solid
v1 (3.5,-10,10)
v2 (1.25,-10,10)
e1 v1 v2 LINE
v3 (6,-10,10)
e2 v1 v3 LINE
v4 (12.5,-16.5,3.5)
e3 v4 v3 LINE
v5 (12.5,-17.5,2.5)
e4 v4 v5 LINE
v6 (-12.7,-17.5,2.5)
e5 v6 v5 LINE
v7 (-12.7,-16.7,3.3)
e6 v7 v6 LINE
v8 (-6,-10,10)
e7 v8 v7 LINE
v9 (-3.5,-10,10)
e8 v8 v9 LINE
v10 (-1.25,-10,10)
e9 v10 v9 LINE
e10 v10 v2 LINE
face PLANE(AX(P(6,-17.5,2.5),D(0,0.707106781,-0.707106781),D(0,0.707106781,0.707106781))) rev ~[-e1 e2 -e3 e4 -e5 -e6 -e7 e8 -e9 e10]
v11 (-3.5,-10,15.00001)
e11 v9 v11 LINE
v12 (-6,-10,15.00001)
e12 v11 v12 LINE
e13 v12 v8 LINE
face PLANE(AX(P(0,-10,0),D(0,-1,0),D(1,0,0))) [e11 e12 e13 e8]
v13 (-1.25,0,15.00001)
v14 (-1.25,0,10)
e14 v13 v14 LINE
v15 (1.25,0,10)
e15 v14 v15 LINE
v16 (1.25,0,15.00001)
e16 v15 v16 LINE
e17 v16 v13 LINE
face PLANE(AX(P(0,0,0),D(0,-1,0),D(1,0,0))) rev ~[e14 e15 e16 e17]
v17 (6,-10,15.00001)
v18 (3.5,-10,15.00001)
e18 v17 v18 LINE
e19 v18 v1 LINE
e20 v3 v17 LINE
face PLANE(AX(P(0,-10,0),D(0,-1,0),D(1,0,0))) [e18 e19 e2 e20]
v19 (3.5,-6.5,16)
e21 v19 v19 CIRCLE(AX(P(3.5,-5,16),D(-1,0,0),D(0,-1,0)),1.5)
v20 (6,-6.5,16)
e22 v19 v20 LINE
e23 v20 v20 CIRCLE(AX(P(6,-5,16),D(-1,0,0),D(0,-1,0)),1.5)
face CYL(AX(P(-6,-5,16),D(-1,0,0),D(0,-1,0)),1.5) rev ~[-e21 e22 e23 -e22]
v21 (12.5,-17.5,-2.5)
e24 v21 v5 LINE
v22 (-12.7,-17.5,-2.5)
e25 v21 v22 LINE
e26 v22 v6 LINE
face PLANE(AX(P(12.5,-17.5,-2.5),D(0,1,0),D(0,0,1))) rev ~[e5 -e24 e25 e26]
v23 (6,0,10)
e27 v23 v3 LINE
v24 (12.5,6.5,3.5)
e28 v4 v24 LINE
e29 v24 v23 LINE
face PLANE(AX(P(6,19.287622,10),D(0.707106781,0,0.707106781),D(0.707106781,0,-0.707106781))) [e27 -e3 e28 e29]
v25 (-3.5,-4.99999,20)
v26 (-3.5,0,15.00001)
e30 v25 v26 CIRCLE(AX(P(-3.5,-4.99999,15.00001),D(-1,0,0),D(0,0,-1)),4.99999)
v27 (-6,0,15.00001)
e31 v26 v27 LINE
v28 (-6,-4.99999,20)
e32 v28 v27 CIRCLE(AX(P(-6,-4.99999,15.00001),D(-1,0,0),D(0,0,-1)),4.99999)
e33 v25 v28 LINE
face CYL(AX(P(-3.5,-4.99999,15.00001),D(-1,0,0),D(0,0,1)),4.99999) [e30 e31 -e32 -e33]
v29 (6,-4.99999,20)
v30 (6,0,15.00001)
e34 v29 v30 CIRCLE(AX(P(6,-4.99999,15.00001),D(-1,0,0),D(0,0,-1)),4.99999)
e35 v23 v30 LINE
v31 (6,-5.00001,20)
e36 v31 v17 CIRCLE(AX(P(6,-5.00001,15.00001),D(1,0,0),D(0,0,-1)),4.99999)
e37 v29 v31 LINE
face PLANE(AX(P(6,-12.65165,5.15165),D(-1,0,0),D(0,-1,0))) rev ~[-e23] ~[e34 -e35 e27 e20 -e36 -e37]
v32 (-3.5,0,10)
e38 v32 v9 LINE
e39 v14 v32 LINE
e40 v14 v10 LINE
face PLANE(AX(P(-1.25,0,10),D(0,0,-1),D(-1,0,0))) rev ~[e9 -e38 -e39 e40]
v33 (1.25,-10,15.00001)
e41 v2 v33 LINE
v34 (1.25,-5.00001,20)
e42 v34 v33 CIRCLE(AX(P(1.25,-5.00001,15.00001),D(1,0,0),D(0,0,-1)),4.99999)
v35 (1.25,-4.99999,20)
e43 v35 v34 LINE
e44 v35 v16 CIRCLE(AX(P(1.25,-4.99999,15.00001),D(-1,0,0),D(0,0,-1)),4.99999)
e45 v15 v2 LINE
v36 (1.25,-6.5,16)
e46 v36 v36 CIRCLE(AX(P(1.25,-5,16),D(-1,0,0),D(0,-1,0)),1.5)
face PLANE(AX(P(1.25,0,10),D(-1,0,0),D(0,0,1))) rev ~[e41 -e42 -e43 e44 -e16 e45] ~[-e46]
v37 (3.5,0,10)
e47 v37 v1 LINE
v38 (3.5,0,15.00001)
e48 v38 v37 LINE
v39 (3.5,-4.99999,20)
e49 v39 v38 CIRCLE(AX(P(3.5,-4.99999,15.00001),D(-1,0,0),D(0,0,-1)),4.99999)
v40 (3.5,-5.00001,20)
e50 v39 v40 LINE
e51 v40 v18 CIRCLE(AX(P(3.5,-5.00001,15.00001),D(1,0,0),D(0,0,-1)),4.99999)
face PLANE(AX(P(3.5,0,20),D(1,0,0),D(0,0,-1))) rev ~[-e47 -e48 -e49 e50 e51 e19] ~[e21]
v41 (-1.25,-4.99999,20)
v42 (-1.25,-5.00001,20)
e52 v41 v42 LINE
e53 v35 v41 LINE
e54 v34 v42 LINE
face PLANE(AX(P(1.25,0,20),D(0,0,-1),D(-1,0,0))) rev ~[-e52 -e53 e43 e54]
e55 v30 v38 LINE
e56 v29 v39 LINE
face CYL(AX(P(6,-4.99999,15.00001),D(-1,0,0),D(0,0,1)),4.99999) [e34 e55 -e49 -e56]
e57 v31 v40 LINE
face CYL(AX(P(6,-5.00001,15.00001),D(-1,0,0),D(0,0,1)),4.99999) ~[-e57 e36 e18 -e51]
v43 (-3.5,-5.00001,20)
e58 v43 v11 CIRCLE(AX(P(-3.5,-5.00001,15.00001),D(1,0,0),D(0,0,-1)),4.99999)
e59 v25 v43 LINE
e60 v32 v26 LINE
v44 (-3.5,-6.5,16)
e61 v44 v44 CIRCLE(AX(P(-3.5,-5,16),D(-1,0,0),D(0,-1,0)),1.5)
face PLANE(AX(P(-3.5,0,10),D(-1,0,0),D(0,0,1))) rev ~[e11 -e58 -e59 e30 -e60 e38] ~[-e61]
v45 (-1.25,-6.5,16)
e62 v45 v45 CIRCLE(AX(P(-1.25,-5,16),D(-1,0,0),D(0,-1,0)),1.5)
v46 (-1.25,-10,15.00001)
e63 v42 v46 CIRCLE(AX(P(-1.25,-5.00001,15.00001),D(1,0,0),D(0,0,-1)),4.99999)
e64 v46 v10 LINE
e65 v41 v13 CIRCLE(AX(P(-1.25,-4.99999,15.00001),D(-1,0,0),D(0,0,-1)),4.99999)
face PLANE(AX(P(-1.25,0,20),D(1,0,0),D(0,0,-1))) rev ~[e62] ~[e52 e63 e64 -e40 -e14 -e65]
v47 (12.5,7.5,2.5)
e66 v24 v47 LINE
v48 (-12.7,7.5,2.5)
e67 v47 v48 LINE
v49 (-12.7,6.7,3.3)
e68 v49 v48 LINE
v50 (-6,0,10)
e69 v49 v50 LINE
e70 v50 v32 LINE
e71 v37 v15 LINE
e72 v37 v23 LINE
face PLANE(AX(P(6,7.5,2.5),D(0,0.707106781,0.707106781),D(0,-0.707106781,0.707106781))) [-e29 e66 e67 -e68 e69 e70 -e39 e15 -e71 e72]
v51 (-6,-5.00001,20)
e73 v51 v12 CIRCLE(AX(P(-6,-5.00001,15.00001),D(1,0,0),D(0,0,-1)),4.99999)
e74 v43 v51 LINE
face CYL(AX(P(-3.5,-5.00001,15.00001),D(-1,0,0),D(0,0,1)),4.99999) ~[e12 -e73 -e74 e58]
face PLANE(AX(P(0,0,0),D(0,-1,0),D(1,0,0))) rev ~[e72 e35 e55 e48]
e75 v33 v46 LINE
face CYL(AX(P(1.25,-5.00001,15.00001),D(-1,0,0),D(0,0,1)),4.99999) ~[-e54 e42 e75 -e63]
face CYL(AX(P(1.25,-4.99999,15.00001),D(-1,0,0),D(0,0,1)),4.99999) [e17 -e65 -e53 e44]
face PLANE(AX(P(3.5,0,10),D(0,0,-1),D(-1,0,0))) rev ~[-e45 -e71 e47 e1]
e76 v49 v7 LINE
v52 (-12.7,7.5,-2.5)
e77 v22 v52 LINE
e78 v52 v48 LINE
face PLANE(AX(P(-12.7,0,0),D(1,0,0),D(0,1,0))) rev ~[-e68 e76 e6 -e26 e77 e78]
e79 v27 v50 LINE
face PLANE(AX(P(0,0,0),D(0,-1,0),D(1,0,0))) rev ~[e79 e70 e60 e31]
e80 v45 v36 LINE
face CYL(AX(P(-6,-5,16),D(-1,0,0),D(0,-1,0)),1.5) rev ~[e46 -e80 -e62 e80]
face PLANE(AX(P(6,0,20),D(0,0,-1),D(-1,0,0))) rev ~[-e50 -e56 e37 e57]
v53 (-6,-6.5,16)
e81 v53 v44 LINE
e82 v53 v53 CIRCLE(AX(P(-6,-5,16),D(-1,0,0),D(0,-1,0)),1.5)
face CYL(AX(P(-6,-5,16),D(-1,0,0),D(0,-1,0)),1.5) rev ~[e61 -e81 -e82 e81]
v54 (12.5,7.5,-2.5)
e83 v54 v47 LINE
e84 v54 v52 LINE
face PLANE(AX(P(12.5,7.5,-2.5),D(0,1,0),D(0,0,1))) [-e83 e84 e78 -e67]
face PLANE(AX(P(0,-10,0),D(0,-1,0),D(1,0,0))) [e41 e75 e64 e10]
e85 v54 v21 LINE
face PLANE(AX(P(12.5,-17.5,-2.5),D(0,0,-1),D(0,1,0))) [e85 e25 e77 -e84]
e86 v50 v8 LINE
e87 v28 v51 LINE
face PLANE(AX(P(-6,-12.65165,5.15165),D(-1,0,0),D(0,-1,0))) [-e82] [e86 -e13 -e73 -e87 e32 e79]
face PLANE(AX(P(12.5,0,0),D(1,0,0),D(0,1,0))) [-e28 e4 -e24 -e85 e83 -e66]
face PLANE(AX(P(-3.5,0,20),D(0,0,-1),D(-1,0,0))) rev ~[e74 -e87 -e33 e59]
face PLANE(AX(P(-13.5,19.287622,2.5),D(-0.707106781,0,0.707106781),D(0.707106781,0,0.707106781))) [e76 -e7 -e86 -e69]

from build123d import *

# Parameters (mm, degrees)
F1_DEPTH     = 10
F2_R         = 4.99999
F3_W         = 7.5
F3_H         = 5
F3_W_2       = 10
F4_DEPTH     = 25.2
F5_T1_DEPTH  = 12
F5_T6_DEPTH  = 10
F5_T11_DEPTH = 10
F5_T17_DEPTH = 29.2876224097
F5_T23_DEPTH = 31.2876224097
F5_T31_DEPTH = 29.2876224097
F5_T37_DEPTH = 31.2876224097
F5_T45_DEPTH = 29.2876224097
F5_T51_DEPTH = 31.2876224097
F5_T59_DEPTH = 31.2876224097
F5_T64_DEPTH = 29.2876224097
F6_R         = 1.5
F7_DEPTH     = 25


# Not quite as in the source:
# - a fillet or chamfer that OpenCascade refuses, or shapes differently, is made with other operations: its cross-section is extruded or revolved along the edge and cut away or added
# - a fillet or chamfer is up to 0.001 mm smaller than in the source, because OpenCascade refuses the exact size


with BuildPart() as f1:
    # F0 (on Front) → F1 (new body)
    with BuildSketch(Plane.XZ):
        Polygon((12.5, -2.5), (12.5, 2.5), (6, 2.5), (-6, 2.5), (-12.5, 2.5), (-12.5, -2.5), align=None)
        Polygon((-6, 2.5), (6, 2.5), (6, 10), (6, 20), (3.5, 20), (3.5, 10), (1.25, 10), (1.25, 20), (0, 20), (-1.25, 20), (-1.25, 10), (-3.5, 10), (-3.5, 20), (-6, 20), (-6, 10), align=None)
    extrude(amount=F1_DEPTH)

    # F2 (radius 5 in the source; OpenCascade refuses exactly that, so slightly less here)
    f2_edges = [f1.edges().sort_by_distance(p)[0] for p in [
        (-4.75, 0, 20),
        (0, 0, 20),
        (4.75, 0, 20),
        (-4.75, -10, 20),
        (0, -10, 20),
        (4.75, -10, 20),
    ]]
    fillet(f2_edges, radius=F2_R)

    # F3 (on face) → F4 (join)
    with BuildSketch(Plane.YZ.offset(12.5)):
        with Locations((-13.75, 0)):
            Rectangle(F3_W, F3_H)
        with Locations((3.75, 0)):
            Rectangle(F3_W, F3_H)
        with Locations((-5, 0)):
            Rectangle(F3_W_2, F3_H)
    extrude(amount=-F4_DEPTH)

    # F5: chamfer of 7.5 on 4 edges, made by hand

    # F5_s2 → F5_t1 (join)
    with BuildSketch(Plane.YZ.offset(-6)):
        Polygon((-17.5, 2.5), (-10, 10), (-10, 2.5), align=None)
        Polygon((7.5, 2.5), (0, 10), (0, 2.5), align=None)
    extrude(amount=F5_T1_DEPTH)


with BuildPart() as f5_tool4:
    # F5_s5 → F5_t6 (new body)
    with BuildSketch(Plane.XZ):
        Polygon((6, 10), (13.5, 2.5), (6, 2.5), align=None)
    extrude(amount=F5_T6_DEPTH)

    split(bisect_by=Plane.YZ.offset(12.5), keep=Keep.BOTTOM)


with BuildPart() as f1_1:
    add(f1.part)

    # F5_t3: union F5_tool4
    add(f5_tool4.part)


with BuildPart() as f5_tool9:
    # F5_s10 → F5_t11 (new body)
    with BuildSketch(Plane.XZ):
        Polygon((-13.5, 2.5), (-6, 10), (-6, 2.5), align=None)
    extrude(amount=F5_T11_DEPTH)

    split(bisect_by=Plane.YZ.offset(-12.7), keep=Keep.TOP)


with BuildPart() as f1_2:
    add(f1_1.part)

    # F5_t8: union F5_tool9
    add(f5_tool9.part)


with BuildPart() as f5_tool15:
    # F5_s16 → F5_t17 (new body)
    with BuildSketch(Plane.XZ):
        Polygon((6, 10), (13.5, 2.5), (6, 2.5), align=None)
    extrude(amount=F5_T17_DEPTH)

    split(bisect_by=Plane.XZ.offset(17.5), keep=Keep.BOTTOM)

    split(bisect_by=Plane.YZ.offset(12.5), keep=Keep.BOTTOM)

    split(bisect_by=Plane.XZ.offset(10), keep=Keep.TOP)


with BuildPart() as f5_tool21:
    # F5_s22 → F5_t23 (new body)
    with BuildSketch(Plane.YZ.offset(25.2876224097)):
        Polygon((-17.5, 2.5), (-10, 10), (-10, 2.5), align=None)
    extrude(amount=-F5_T23_DEPTH)

    split(bisect_by=Plane.YZ.offset(6), keep=Keep.TOP)

    split(bisect_by=Plane.YZ.offset(12.5), keep=Keep.BOTTOM)


with BuildPart() as f5_tool15_1:
    add(f5_tool15.part)

    # F5_t26: intersect F5_tool21
    add(f5_tool21.part, mode=Mode.INTERSECT)


with BuildPart() as f1_3:
    add(f1_2.part)

    # F5_t13: union F5_tool15
    add(f5_tool15_1.part)


with BuildPart() as f5_tool29:
    # F5_s30 → F5_t31 (new body)
    with BuildSketch(Plane.XZ):
        Polygon((-13.5, 2.5), (-6, 10), (-6, 2.5), align=None)
    extrude(amount=F5_T31_DEPTH)

    split(bisect_by=Plane.YZ.offset(-12.7), keep=Keep.TOP)

    split(bisect_by=Plane.XZ.offset(17.5), keep=Keep.BOTTOM)

    split(bisect_by=Plane.XZ.offset(10), keep=Keep.TOP)


with BuildPart() as f5_tool35:
    # F5_s36 → F5_t37 (new body)
    with BuildSketch(Plane.YZ.offset(6)):
        Polygon((-17.5, 2.5), (-10, 10), (-10, 2.5), align=None)
    extrude(amount=-F5_T37_DEPTH)

    split(bisect_by=Plane.YZ.offset(-6), keep=Keep.BOTTOM)

    split(bisect_by=Plane.YZ.offset(-12.7), keep=Keep.TOP)


with BuildPart() as f5_tool29_1:
    add(f5_tool29.part)

    # F5_t40: intersect F5_tool35
    add(f5_tool35.part, mode=Mode.INTERSECT)


with BuildPart() as f1_4:
    add(f1_3.part)

    # F5_t27: union F5_tool29
    add(f5_tool29_1.part)


with BuildPart() as f5_tool43:
    # F5_s44 → F5_t45 (new body)
    with BuildSketch(Plane.XZ.offset(-19.2876224097)):
        Polygon((6, 10), (13.5, 2.5), (6, 2.5), align=None)
    extrude(amount=F5_T45_DEPTH)

    split(bisect_by=Plane.XZ.offset(-7.5), keep=Keep.TOP)

    split(bisect_by=Plane.YZ.offset(12.5), keep=Keep.BOTTOM)

    split(bisect_by=Plane.XZ, keep=Keep.BOTTOM)


with BuildPart() as f5_tool49:
    # F5_s50 → F5_t51 (new body)
    with BuildSketch(Plane.YZ.offset(25.2876224097)):
        Polygon((7.5, 2.5), (0, 10), (0, 2.5), align=None)
    extrude(amount=-F5_T51_DEPTH)

    split(bisect_by=Plane.YZ.offset(6), keep=Keep.TOP)

    split(bisect_by=Plane.YZ.offset(12.5), keep=Keep.BOTTOM)


with BuildPart() as f5_tool43_1:
    add(f5_tool43.part)

    # F5_t54: intersect F5_tool49
    add(f5_tool49.part, mode=Mode.INTERSECT)


with BuildPart() as f1_5:
    add(f1_4.part)

    # F5_t41: union F5_tool43
    add(f5_tool43_1.part)


with BuildPart() as f5_tool57:
    # F5_s58 → F5_t59 (new body)
    with BuildSketch(Plane.YZ.offset(6)):
        Polygon((7.5, 2.5), (0, 10), (0, 2.5), align=None)
    extrude(amount=-F5_T59_DEPTH)

    split(bisect_by=Plane.YZ.offset(-6), keep=Keep.BOTTOM)

    split(bisect_by=Plane.YZ.offset(-12.7), keep=Keep.TOP)


with BuildPart() as f5_tool62:
    # F5_s63 → F5_t64 (new body)
    with BuildSketch(Plane.XZ.offset(-19.2876224097)):
        Polygon((-13.5, 2.5), (-6, 10), (-6, 2.5), align=None)
    extrude(amount=F5_T64_DEPTH)

    split(bisect_by=Plane.XZ.offset(-7.5), keep=Keep.TOP)

    split(bisect_by=Plane.YZ.offset(-12.7), keep=Keep.TOP)

    split(bisect_by=Plane.XZ, keep=Keep.BOTTOM)


with BuildPart() as f5_tool57_1:
    add(f5_tool57.part)

    # F5_t68: intersect F5_tool62
    add(f5_tool62.part, mode=Mode.INTERSECT)


with BuildPart() as f1_6:
    add(f1_5.part)

    # F5_t55: union F5_tool57
    add(f5_tool57_1.part)

    # F6 (on face) → F7 (cut)
    with BuildSketch(Plane(origin=(-6, 0, 0), x_dir=(0, -1, 0), z_dir=(-1, 0, 0))):
        with Locations((5, 16)):
            Circle(F6_R)
    extrude(amount=-F7_DEPTH, mode=Mode.SUBTRACT)


solid = f1_6.part
